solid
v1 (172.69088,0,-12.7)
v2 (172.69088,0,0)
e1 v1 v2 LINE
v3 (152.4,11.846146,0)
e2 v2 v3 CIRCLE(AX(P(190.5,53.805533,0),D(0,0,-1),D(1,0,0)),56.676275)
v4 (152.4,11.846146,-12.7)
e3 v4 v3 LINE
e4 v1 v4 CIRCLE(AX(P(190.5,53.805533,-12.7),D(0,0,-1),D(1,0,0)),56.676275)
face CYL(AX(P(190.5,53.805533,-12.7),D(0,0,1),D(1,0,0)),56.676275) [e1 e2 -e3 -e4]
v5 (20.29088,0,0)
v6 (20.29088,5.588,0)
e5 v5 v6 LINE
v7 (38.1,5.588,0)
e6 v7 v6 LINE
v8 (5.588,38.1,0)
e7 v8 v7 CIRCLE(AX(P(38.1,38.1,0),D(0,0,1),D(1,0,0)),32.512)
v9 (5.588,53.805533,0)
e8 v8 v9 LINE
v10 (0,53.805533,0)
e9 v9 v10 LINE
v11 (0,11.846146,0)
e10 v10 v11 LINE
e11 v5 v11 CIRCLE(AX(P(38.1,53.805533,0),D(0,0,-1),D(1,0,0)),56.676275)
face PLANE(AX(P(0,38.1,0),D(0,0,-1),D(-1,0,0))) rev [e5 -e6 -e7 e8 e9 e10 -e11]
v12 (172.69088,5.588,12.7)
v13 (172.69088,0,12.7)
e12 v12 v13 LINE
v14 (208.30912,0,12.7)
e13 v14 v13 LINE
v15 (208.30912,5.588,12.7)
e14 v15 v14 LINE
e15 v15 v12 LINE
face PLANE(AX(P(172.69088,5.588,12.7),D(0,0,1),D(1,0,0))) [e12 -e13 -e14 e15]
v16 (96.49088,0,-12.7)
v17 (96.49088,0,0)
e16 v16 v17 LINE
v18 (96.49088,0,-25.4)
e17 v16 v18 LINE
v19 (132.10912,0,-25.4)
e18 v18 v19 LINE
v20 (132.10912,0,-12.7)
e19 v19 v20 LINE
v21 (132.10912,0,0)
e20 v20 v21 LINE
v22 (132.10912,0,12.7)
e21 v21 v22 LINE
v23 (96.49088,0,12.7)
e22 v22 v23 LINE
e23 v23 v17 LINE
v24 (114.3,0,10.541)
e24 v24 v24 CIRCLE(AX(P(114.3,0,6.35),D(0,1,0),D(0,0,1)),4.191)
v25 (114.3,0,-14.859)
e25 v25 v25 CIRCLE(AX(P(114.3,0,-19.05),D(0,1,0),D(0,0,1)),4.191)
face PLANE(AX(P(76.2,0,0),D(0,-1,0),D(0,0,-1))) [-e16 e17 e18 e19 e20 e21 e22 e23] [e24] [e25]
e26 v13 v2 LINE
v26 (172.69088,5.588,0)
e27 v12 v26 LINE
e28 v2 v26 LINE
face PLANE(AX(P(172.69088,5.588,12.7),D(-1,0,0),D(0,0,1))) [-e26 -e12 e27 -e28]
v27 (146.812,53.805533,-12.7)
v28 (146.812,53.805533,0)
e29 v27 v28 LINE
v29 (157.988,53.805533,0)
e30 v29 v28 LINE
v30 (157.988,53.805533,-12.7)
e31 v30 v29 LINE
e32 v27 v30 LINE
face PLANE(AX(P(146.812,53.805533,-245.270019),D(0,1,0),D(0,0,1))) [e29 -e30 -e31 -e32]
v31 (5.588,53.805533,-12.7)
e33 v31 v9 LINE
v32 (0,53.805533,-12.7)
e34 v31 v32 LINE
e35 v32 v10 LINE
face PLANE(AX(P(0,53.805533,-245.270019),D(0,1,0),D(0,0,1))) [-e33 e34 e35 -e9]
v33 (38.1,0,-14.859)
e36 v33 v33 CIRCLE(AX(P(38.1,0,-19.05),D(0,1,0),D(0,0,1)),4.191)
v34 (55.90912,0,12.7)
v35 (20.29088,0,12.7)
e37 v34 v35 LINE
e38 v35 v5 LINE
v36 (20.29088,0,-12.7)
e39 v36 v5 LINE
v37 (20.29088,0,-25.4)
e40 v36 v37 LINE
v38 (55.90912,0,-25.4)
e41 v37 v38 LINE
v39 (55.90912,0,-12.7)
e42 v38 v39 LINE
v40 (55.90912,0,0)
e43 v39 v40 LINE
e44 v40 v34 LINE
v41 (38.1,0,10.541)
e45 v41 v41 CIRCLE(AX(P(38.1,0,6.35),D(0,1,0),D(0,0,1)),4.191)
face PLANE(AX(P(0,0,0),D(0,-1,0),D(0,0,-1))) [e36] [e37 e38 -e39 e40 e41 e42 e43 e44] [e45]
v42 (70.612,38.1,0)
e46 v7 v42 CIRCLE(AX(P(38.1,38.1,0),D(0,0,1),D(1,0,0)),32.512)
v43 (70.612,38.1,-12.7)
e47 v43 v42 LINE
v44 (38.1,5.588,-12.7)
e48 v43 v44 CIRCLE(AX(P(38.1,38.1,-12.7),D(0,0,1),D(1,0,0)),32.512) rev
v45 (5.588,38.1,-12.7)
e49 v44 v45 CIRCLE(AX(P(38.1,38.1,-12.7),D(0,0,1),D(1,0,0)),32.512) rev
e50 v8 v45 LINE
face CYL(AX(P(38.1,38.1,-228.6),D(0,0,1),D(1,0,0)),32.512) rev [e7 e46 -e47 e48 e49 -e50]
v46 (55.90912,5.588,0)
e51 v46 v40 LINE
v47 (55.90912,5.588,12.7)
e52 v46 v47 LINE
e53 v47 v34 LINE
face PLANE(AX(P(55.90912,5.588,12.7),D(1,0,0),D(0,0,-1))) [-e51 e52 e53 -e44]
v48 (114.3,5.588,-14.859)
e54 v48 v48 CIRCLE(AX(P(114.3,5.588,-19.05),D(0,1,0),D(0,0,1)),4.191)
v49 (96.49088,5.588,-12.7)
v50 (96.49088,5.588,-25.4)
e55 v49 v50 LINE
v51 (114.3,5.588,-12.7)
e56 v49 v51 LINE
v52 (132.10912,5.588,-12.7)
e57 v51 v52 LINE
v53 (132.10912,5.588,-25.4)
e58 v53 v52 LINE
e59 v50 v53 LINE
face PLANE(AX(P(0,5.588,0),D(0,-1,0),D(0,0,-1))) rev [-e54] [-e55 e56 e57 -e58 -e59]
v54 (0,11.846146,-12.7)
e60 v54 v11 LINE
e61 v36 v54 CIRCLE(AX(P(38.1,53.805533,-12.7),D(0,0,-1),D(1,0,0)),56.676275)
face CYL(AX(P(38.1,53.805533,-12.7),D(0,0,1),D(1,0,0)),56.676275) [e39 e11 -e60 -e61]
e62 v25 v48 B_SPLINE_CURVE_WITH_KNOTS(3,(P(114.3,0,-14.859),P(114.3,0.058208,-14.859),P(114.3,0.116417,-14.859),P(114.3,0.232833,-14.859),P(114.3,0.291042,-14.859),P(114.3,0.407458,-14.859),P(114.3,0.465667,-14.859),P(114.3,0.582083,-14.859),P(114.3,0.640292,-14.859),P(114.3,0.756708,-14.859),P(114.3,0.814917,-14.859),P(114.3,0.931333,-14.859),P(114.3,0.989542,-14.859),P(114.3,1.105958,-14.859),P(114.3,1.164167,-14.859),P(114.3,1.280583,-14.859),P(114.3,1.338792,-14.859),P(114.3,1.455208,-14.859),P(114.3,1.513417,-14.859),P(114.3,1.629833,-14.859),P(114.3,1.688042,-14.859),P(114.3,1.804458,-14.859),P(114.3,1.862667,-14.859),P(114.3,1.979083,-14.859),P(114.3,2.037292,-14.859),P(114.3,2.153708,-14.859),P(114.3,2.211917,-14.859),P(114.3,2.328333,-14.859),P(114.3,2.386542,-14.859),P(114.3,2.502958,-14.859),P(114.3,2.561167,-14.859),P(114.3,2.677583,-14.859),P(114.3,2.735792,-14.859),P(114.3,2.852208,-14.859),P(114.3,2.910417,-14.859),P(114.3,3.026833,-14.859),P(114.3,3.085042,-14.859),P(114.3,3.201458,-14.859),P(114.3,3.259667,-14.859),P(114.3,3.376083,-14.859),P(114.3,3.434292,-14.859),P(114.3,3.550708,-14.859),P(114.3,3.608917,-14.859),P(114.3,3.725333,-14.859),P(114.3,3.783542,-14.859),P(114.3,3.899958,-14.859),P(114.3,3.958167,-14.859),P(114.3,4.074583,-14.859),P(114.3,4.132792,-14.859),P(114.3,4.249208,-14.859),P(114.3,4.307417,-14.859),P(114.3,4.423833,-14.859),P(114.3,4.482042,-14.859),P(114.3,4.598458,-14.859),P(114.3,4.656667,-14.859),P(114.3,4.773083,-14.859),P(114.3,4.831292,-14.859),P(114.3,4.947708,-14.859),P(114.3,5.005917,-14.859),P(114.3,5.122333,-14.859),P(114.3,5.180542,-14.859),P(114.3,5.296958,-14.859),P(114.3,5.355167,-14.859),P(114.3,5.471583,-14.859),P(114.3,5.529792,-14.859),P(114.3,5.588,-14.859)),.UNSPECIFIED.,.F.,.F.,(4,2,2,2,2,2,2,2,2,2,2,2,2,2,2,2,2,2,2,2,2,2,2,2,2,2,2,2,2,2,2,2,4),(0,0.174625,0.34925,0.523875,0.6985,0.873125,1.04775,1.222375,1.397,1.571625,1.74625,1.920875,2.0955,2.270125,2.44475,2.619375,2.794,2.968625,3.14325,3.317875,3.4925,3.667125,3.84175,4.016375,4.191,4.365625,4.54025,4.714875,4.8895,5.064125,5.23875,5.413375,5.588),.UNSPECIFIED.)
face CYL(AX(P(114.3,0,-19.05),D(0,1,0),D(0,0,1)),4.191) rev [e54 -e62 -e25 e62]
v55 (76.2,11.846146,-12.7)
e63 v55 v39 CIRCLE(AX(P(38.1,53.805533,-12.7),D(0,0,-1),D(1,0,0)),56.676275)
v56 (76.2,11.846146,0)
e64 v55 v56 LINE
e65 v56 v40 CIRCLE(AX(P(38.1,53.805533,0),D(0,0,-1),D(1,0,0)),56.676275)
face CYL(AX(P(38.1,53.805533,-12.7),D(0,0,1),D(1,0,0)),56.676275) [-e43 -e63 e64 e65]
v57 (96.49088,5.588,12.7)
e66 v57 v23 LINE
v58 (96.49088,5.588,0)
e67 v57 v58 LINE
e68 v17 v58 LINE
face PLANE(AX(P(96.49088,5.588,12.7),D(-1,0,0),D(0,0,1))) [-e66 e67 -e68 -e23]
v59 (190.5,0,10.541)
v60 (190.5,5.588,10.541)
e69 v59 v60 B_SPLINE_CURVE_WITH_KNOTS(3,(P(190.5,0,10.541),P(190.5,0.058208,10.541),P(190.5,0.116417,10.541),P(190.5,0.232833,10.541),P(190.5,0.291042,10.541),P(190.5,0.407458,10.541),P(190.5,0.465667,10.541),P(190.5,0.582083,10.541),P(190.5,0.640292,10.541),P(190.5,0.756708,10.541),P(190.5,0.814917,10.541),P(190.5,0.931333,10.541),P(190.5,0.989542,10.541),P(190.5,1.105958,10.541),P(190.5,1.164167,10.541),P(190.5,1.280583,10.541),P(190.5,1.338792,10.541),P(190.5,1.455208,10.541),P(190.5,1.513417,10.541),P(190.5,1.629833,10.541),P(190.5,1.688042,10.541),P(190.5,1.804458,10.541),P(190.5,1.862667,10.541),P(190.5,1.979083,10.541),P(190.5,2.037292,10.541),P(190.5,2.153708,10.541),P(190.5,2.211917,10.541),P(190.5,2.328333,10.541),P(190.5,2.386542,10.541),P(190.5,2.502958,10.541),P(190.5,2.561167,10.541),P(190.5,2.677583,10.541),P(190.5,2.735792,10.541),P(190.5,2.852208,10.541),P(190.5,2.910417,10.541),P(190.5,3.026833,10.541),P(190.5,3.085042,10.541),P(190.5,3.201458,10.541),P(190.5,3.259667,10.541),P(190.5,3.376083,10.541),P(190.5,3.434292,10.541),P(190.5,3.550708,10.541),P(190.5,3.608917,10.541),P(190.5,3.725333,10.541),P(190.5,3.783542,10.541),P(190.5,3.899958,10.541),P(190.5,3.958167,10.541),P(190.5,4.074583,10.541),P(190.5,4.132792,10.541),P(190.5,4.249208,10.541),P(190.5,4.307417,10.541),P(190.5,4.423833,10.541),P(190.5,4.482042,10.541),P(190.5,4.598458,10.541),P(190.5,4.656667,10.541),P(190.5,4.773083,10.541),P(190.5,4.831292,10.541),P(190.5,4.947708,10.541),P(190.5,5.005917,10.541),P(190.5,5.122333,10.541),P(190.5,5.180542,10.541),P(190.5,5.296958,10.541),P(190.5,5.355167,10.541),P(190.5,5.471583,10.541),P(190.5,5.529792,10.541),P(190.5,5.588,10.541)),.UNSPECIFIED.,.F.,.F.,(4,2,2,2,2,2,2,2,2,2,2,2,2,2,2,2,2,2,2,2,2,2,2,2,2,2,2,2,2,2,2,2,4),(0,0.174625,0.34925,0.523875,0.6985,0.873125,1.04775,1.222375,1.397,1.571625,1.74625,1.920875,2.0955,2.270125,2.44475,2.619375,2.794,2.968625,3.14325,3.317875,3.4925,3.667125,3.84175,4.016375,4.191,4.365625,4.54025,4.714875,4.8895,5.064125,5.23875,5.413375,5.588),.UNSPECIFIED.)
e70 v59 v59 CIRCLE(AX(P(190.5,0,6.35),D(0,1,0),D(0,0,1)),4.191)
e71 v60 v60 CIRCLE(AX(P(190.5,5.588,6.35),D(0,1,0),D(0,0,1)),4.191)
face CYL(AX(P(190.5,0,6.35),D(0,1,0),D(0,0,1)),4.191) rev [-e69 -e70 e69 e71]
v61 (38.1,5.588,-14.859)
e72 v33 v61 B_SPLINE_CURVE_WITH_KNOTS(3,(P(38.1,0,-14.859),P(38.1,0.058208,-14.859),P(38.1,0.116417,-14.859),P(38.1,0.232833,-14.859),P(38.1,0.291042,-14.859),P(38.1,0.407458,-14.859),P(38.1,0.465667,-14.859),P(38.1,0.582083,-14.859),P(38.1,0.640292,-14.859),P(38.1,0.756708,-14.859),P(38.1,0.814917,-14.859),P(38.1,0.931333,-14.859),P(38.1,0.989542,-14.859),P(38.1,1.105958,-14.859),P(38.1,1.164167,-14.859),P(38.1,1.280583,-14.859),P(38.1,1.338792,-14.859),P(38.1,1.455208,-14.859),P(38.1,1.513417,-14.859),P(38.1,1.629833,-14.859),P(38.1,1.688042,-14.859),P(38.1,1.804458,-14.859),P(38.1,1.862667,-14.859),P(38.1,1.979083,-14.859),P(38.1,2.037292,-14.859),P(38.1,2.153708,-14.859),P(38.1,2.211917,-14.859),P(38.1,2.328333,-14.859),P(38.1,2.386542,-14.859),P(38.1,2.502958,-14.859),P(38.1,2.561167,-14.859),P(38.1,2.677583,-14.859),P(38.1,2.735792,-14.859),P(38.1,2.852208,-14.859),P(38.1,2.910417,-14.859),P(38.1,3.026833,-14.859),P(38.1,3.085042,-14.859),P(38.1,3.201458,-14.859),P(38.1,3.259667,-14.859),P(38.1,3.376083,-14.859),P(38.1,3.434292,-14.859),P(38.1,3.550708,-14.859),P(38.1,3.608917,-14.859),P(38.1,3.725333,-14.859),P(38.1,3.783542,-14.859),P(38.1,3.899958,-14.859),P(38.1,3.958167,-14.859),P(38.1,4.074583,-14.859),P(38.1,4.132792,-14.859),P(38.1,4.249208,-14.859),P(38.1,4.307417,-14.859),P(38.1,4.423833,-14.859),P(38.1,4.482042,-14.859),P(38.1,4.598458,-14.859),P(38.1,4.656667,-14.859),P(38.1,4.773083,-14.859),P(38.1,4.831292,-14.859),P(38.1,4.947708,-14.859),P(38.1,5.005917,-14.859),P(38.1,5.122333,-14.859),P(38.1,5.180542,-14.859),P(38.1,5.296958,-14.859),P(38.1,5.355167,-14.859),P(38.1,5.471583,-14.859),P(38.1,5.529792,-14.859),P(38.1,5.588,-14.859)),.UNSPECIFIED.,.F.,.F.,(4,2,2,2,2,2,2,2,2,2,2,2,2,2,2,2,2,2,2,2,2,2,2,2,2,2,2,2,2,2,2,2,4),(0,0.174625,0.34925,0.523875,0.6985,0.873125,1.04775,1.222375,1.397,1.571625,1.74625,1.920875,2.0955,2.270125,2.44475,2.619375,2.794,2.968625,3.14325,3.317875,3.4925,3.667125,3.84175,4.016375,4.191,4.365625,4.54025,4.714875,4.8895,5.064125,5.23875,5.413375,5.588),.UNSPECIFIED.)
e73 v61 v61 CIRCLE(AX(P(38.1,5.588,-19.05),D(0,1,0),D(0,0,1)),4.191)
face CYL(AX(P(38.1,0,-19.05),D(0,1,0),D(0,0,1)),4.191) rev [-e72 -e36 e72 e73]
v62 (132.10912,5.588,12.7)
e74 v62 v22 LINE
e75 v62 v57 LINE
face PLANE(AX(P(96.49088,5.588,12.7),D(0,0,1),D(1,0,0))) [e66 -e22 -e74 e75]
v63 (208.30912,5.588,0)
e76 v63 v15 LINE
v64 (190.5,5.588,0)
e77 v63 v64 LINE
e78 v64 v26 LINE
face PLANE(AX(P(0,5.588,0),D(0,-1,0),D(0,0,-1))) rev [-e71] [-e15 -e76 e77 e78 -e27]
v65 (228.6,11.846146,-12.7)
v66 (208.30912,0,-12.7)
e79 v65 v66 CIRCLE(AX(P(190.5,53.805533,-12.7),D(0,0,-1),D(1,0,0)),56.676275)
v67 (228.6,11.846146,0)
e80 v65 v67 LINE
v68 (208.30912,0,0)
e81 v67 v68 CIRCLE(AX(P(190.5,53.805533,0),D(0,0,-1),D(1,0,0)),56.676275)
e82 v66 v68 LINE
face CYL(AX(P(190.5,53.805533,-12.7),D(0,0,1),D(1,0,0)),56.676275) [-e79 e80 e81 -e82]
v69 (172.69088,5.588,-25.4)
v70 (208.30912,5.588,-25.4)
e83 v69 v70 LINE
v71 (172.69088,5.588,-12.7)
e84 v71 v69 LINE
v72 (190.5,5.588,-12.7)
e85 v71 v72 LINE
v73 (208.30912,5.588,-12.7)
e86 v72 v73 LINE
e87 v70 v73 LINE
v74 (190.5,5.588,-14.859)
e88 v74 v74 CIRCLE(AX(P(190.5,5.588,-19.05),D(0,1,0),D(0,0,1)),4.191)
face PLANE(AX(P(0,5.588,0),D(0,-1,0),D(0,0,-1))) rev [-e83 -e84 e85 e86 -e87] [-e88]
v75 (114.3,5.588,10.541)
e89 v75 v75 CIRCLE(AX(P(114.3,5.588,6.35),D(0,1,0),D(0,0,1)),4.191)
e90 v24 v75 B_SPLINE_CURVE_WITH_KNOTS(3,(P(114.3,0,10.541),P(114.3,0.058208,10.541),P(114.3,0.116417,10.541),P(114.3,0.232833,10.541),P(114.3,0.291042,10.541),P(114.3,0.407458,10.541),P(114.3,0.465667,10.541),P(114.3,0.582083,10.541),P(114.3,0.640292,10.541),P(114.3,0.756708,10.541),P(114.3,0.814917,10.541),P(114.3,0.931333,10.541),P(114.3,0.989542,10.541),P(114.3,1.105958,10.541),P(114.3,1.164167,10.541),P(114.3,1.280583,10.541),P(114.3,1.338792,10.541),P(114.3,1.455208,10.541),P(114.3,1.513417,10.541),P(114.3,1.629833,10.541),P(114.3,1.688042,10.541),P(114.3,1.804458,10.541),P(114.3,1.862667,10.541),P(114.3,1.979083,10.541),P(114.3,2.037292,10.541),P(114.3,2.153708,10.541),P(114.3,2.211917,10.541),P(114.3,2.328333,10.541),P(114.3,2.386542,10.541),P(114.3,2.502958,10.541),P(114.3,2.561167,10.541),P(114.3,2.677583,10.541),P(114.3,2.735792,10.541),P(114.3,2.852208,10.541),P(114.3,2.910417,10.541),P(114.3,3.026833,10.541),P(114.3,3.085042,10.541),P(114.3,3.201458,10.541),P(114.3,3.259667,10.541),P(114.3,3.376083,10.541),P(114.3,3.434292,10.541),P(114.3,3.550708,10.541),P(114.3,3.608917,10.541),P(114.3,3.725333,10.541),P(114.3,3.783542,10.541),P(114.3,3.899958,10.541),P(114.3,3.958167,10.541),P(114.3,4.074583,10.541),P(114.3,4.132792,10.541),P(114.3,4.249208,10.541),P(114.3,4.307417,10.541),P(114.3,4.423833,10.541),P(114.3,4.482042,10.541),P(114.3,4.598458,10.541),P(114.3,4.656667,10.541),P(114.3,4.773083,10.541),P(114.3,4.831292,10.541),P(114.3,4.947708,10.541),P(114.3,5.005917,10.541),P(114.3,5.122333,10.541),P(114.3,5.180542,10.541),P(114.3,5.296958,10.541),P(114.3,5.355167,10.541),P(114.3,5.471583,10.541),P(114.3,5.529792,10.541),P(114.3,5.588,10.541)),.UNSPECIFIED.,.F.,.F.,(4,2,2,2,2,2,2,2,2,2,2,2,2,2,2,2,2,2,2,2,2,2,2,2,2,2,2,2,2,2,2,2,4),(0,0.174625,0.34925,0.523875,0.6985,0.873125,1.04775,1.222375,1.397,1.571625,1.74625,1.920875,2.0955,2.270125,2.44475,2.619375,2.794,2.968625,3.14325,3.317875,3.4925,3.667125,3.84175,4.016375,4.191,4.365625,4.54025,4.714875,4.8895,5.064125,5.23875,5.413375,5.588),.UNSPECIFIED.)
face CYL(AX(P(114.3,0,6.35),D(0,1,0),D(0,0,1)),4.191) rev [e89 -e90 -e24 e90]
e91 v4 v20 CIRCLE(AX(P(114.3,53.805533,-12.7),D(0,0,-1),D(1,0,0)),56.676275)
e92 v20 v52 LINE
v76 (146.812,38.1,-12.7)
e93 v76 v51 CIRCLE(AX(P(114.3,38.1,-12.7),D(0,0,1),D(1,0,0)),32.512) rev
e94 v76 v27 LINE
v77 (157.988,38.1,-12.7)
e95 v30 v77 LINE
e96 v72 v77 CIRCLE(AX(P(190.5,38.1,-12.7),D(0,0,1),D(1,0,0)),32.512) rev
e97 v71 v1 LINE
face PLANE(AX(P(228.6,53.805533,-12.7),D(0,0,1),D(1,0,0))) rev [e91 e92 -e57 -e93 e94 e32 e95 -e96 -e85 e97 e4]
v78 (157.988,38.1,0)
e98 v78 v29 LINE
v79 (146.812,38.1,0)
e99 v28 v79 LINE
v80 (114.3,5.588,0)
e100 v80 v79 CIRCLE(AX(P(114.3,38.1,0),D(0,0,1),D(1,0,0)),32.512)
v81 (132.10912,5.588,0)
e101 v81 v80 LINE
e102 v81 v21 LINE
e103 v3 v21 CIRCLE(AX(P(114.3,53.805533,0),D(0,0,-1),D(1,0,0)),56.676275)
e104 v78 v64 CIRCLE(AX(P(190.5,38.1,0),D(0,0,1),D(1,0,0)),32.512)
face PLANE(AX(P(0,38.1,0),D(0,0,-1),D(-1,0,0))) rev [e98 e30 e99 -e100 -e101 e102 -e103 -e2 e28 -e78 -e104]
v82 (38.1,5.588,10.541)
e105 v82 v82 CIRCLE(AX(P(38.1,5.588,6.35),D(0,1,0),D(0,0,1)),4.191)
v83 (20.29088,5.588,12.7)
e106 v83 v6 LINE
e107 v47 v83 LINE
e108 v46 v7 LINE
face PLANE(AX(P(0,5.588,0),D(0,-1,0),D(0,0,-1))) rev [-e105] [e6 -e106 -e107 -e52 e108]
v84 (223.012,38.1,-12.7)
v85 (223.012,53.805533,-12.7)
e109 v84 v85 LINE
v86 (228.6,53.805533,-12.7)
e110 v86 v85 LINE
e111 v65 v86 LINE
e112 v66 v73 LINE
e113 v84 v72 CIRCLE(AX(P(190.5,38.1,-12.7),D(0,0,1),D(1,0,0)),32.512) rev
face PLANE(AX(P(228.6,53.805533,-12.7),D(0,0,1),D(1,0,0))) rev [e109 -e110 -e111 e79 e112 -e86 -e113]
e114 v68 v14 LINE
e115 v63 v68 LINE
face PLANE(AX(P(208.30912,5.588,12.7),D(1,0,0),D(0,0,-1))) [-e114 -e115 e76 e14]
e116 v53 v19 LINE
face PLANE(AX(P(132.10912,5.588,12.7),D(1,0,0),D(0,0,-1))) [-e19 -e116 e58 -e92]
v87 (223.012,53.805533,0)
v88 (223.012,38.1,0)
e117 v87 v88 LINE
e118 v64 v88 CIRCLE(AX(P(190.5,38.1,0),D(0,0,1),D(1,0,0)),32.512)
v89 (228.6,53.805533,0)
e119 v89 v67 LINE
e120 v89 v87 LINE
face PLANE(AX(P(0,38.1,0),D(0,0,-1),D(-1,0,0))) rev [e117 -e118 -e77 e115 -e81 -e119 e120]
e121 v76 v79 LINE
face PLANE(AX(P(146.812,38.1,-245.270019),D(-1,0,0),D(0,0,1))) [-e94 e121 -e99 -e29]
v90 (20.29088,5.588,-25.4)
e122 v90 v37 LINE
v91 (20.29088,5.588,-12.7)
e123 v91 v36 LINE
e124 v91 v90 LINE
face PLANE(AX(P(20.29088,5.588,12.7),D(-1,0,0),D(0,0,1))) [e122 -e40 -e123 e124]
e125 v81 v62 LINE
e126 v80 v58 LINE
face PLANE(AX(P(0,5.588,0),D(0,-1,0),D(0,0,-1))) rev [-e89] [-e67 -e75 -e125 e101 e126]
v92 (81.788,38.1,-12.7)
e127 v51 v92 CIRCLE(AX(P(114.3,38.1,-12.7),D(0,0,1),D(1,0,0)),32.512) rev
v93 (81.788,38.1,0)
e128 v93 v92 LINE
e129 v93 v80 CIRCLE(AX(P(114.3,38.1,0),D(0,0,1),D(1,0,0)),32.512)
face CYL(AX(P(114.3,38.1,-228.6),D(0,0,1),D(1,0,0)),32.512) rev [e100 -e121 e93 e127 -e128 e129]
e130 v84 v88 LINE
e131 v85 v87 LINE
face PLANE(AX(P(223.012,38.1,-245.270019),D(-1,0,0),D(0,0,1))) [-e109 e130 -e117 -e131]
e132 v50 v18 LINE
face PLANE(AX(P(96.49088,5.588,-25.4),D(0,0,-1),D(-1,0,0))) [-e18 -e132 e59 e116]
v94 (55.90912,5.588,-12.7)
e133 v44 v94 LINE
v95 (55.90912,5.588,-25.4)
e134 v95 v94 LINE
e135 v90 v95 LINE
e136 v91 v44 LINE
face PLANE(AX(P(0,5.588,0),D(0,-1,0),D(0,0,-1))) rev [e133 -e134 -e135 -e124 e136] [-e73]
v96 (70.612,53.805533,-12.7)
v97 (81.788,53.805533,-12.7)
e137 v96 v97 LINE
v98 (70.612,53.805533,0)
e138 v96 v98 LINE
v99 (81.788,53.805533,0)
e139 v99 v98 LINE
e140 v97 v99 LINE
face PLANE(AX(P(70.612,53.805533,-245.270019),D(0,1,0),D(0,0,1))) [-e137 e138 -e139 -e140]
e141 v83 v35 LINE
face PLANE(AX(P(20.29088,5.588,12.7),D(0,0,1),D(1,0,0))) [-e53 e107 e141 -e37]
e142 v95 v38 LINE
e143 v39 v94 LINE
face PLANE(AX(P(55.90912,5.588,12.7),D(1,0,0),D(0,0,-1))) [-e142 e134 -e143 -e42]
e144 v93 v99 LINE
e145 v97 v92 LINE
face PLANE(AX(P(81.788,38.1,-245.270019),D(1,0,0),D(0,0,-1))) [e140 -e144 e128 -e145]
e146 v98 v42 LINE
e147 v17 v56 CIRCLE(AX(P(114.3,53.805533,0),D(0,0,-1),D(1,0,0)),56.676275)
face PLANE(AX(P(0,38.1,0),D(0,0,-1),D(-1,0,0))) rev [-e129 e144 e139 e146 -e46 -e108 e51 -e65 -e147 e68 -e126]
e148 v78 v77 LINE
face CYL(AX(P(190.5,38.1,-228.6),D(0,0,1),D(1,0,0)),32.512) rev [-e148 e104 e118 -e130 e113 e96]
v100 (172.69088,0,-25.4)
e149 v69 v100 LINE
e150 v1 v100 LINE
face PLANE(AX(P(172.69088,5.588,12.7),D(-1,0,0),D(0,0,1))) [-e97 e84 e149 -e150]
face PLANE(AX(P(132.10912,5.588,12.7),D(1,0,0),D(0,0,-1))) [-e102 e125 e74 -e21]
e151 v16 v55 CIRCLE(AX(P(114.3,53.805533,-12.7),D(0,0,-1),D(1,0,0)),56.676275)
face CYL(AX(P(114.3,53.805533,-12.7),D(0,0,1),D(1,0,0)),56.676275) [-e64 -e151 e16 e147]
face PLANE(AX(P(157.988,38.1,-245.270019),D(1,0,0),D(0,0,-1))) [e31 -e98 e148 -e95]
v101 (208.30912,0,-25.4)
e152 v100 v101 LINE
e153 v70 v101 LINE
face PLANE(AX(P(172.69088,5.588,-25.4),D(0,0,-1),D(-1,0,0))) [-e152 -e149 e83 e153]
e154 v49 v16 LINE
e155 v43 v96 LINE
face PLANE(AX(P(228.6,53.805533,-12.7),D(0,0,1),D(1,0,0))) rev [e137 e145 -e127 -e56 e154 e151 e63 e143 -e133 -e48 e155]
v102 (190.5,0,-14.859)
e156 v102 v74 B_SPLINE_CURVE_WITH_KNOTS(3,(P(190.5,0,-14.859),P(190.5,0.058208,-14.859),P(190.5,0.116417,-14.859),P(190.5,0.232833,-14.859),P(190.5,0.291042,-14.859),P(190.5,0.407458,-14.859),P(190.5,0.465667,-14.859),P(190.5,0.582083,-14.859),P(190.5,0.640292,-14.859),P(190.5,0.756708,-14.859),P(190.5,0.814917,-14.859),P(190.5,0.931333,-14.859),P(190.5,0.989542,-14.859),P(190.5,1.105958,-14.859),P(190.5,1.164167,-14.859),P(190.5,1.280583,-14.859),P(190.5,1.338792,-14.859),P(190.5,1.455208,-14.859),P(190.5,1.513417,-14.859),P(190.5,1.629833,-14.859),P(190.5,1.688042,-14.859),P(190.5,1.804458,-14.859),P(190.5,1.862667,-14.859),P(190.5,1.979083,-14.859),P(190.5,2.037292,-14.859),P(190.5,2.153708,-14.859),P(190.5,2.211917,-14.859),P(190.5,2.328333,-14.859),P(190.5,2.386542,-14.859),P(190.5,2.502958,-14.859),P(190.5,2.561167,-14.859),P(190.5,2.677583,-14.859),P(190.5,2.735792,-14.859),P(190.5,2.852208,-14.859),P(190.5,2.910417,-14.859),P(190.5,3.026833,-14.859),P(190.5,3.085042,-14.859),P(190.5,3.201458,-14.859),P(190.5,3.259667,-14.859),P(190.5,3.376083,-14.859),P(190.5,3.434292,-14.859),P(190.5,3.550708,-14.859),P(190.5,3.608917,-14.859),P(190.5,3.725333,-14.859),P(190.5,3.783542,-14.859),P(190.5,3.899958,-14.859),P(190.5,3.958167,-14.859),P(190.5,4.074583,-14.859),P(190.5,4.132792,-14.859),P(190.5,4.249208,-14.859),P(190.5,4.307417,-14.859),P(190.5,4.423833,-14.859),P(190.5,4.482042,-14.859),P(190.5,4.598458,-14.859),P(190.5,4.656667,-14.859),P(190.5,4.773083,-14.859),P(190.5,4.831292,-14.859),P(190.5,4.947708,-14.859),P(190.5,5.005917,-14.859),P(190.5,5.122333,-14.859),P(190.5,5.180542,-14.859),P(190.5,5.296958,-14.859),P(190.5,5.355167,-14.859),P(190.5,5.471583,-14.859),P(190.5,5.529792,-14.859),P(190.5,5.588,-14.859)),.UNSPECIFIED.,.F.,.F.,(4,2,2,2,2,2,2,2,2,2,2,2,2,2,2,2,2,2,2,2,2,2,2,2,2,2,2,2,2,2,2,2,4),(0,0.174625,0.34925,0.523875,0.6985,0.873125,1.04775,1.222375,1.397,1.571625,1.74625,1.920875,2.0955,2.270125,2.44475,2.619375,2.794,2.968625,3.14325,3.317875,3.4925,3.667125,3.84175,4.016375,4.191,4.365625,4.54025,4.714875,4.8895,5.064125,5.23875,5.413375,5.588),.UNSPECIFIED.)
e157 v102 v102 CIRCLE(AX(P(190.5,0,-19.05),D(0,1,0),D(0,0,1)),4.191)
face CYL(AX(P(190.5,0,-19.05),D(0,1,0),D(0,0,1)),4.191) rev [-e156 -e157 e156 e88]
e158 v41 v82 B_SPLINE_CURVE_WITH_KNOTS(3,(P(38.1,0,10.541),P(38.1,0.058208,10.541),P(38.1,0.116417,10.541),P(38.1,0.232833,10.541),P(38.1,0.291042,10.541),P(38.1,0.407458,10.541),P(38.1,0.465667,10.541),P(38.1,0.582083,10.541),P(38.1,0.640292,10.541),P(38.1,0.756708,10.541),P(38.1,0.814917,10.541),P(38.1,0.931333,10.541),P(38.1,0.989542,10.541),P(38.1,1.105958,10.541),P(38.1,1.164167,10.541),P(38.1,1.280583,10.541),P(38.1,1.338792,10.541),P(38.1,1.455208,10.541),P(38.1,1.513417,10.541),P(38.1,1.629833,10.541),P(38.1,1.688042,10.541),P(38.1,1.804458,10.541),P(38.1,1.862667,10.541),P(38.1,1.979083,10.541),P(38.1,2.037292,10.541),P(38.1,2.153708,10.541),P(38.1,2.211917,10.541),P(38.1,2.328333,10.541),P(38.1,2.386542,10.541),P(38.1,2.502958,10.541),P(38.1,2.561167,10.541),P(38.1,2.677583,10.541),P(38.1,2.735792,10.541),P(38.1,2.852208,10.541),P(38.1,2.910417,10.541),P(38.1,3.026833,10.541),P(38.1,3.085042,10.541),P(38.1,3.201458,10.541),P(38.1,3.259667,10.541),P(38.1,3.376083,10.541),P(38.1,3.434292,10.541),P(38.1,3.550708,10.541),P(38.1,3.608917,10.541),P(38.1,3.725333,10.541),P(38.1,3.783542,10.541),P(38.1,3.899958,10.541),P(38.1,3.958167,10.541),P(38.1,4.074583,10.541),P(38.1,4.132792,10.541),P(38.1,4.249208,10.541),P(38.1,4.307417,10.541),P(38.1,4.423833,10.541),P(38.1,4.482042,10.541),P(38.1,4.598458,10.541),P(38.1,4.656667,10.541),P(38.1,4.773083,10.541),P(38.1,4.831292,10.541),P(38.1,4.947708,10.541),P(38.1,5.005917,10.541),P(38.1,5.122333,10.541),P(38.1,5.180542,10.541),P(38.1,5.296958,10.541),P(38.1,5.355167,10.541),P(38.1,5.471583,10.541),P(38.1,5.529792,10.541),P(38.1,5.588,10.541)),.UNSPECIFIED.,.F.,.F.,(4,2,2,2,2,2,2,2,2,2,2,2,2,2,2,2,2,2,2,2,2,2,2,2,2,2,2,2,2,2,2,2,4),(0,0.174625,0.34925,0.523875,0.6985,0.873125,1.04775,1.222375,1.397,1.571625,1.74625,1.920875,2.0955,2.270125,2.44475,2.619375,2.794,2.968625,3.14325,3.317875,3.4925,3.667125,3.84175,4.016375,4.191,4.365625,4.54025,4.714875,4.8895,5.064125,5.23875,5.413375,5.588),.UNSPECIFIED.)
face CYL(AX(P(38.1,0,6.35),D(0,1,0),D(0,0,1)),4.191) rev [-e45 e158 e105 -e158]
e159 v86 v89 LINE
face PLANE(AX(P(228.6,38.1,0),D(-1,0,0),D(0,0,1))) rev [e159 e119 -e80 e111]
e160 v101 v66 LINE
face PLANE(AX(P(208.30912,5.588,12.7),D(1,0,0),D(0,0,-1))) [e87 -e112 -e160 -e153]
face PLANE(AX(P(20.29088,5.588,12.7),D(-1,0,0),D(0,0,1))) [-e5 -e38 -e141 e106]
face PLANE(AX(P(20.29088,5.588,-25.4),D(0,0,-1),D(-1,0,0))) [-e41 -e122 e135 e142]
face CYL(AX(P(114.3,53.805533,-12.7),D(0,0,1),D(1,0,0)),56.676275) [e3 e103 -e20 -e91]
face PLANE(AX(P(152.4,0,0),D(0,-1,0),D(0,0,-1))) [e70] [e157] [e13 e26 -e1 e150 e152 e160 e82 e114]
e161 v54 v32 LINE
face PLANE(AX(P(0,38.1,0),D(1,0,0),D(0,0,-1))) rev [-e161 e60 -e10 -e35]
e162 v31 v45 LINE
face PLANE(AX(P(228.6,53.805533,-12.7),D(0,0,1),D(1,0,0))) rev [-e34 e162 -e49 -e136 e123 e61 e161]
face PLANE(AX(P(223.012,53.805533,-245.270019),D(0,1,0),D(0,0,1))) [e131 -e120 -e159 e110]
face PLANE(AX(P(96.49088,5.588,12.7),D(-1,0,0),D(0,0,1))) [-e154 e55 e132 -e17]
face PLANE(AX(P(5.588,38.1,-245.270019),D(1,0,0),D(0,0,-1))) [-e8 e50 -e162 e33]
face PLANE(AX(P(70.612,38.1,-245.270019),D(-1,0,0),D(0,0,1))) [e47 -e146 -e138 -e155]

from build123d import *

# Parameters (mm, degrees)
SKETCH1_W               = 76.2
SKETCH1_H               = 228.6
BOSS_EXTRUDE1_DEPTH     = 38.1
SKETCH2_R               = 32.512
CUT_EXTRUDE2_DEPTH      = 244.959033446
SKETCH3_W               = 5.588
SKETCH3_H               = 15.705533419
BOSS_EXTRUDE2_DEPTH     = 228.6
SKETCH4_W               = 8.89
SKETCH4_H               = 5.08
CUT_EXTRUDE3_DEPTH      = 247.899646469
CRVPATTERN1_START       = -228.6
CRVPATTERN1_OUTLINE_W   = 5.588
CRVPATTERN1_OUTLINE_H   = 5.312766709
CRVPATTERN1_DEPTH       = 228.6
CRVPATTERN1_START_2     = -165.1
CRVPATTERN1_2_OUTLINE_W = 5.588
CRVPATTERN1_2_OUTLINE_H = 5.08
CRVPATTERN1_2_DEPTH     = 101.6
CRVPATTERN1_3_OUTLINE_W = 5.588
CRVPATTERN1_3_OUTLINE_H = 5.08
CRVPATTERN1_3_DEPTH     = 54.61
CRVPATTERN1_START_3     = -54.61
CRVPATTERN1_4_OUTLINE_W = 5.588
CRVPATTERN1_4_OUTLINE_H = 5.08
CRVPATTERN1_4_DEPTH     = 54.61
CRVPATTERN1_5_OUTLINE_W = 5.588
CRVPATTERN1_5_OUTLINE_H = 5.312766709
CRVPATTERN1_5_DEPTH     = 228.6
CRVPATTERN1_6_OUTLINE_W = 5.588
CRVPATTERN1_6_OUTLINE_H = 5.08
CRVPATTERN1_6_DEPTH     = 101.6
CRVPATTERN1_7_OUTLINE_W = 5.588
CRVPATTERN1_7_OUTLINE_H = 5.08
CRVPATTERN1_7_DEPTH     = 54.61
CRVPATTERN1_8_OUTLINE_W = 5.588
CRVPATTERN1_8_OUTLINE_H = 5.08
CRVPATTERN1_8_DEPTH     = 54.61
SKETCH6_W               = 215.9
SKETCH6_H               = 53.805533419
CUT_EXTRUDE4_DEPTH      = 328.736106382
CUT_EXTRUDE5_DEPTH      = 236.189892271
BOSS_EXTRUDE4_START     = -5.588
SKETCH8_W               = 35.618239262
SKETCH8_H               = 38.1
BOSS_EXTRUDE4_DEPTH     = 5.588
SKETCH9_R               = 4.191
CUT_EXTRUDE6_DEPTH      = 236.006490398


# Read off the part's stored shape, not the designer's step: CrvPattern1
with BuildPart() as part:
    # Sketch1 → Boss-Extrude1 (new body)
    with BuildSketch(Plane(origin=(0, 0, 0), x_dir=(1, 0, 0), z_dir=(0, 1, 0))):
        with Locations((38.1, 114.3)):
            Rectangle(SKETCH1_W, SKETCH1_H)
    extrude(amount=BOSS_EXTRUDE1_DEPTH)

    # Sketch2 → Cut-Extrude2 (cut, through all)
    with BuildSketch(Plane.XY):
        with Locations((38.1, 38.1)):
            Circle(SKETCH2_R)
    extrude(amount=-CUT_EXTRUDE2_DEPTH, mode=Mode.SUBTRACT)

    # Sketch3 → Boss-Extrude2 (add)
    with BuildSketch(Plane.XY):
        with Locations((2.794, 45.95276671)):
            Rectangle(SKETCH3_W, SKETCH3_H)
        with Locations((73.406, 45.95276671)):
            Rectangle(SKETCH3_W, SKETCH3_H)
    extrude(amount=-BOSS_EXTRUDE2_DEPTH)

    # Sketch4 → Cut-Extrude3 (cut, through all)
    with BuildSketch(Plane(origin=(76.2, 0, 0), x_dir=(0, 0, -1), z_dir=(1, 0, 0))):
        with Locations((59.055, 45.95276671)):
            Rectangle(SKETCH4_W, SKETCH4_H)
        with Locations((169.545, 45.95276671)):
            Rectangle(SKETCH4_W, SKETCH4_H)
    extrude(amount=-CUT_EXTRUDE3_DEPTH, mode=Mode.SUBTRACT)


with BuildPart() as body_2:
    # CrvPattern1 outline → CrvPattern1 (new body)
    with BuildSketch(Plane.XY.offset(CRVPATTERN1_START)):
        with BuildLine():
            Line((152.4, 43.41276671), (152.4, 0))
            Line((152.4, 0), (228.6, 0))
            Line((228.6, 0), (228.6, 43.41276671))
            Line((228.6, 43.41276671), (223.012, 43.41276671))
            Line((223.012, 43.41276671), (223.012, 38.1))
            ThreePointArc((223.012, 38.1), (190.5, 5.588), (157.988, 38.1))
            Line((157.988, 38.1), (157.988, 43.41276671))
            Line((157.988, 43.41276671), (152.4, 43.41276671))
        make_face()
        with Locations((155.194, 51.149150065)):
            Rectangle(CRVPATTERN1_OUTLINE_W, CRVPATTERN1_OUTLINE_H)
        with Locations((225.806, 51.149150065)):
            Rectangle(CRVPATTERN1_OUTLINE_W, CRVPATTERN1_OUTLINE_H)
    extrude(amount=CRVPATTERN1_DEPTH)

    # CrvPattern1 2 outline → CrvPattern1 2 (add)
    with BuildSketch(Plane.XY.offset(CRVPATTERN1_START_2)):
        with Locations((155.194, 45.95276671)):
            Rectangle(CRVPATTERN1_2_OUTLINE_W, CRVPATTERN1_2_OUTLINE_H)
        with Locations((225.806, 45.95276671)):
            Rectangle(CRVPATTERN1_2_OUTLINE_W, CRVPATTERN1_2_OUTLINE_H)
    extrude(amount=CRVPATTERN1_2_DEPTH)

    # CrvPattern1 3 outline → CrvPattern1 3 (add)
    with BuildSketch(Plane.XY.offset(CRVPATTERN1_START)):
        with Locations((155.194, 45.95276671)):
            Rectangle(CRVPATTERN1_3_OUTLINE_W, CRVPATTERN1_3_OUTLINE_H)
        with Locations((225.806, 45.95276671)):
            Rectangle(CRVPATTERN1_3_OUTLINE_W, CRVPATTERN1_3_OUTLINE_H)
    extrude(amount=CRVPATTERN1_3_DEPTH)

    # CrvPattern1 4 outline → CrvPattern1 4 (add)
    with BuildSketch(Plane.XY.offset(CRVPATTERN1_START_3)):
        with Locations((155.194, 45.95276671)):
            Rectangle(CRVPATTERN1_4_OUTLINE_W, CRVPATTERN1_4_OUTLINE_H)
        with Locations((225.806, 45.95276671)):
            Rectangle(CRVPATTERN1_4_OUTLINE_W, CRVPATTERN1_4_OUTLINE_H)
    extrude(amount=CRVPATTERN1_4_DEPTH)


with BuildPart() as body_3:
    # CrvPattern1 5 outline → CrvPattern1 5 (new body)
    with BuildSketch(Plane.XY.offset(CRVPATTERN1_START)):
        with BuildLine():
            Line((76.2, 43.41276671), (76.2, 0))
            Line((76.2, 0), (152.4, 0))
            Line((152.4, 0), (152.4, 43.41276671))
            Line((152.4, 43.41276671), (146.812, 43.41276671))
            Line((146.812, 43.41276671), (146.812, 38.1))
            ThreePointArc((146.812, 38.1), (114.3, 5.588), (81.788, 38.1))
            Line((81.788, 38.1), (81.788, 43.41276671))
            Line((81.788, 43.41276671), (76.2, 43.41276671))
        make_face()
        with Locations((78.994, 51.149150065)):
            Rectangle(CRVPATTERN1_5_OUTLINE_W, CRVPATTERN1_5_OUTLINE_H)
        with Locations((149.606, 51.149150065)):
            Rectangle(CRVPATTERN1_5_OUTLINE_W, CRVPATTERN1_5_OUTLINE_H)
    extrude(amount=CRVPATTERN1_5_DEPTH)

    # CrvPattern1 6 outline → CrvPattern1 6 (add)
    with BuildSketch(Plane.XY.offset(CRVPATTERN1_START_2)):
        with Locations((78.994, 45.95276671)):
            Rectangle(CRVPATTERN1_6_OUTLINE_W, CRVPATTERN1_6_OUTLINE_H)
        with Locations((149.606, 45.95276671)):
            Rectangle(CRVPATTERN1_6_OUTLINE_W, CRVPATTERN1_6_OUTLINE_H)
    extrude(amount=CRVPATTERN1_6_DEPTH)

    # CrvPattern1 7 outline → CrvPattern1 7 (add)
    with BuildSketch(Plane.XY.offset(CRVPATTERN1_START)):
        with Locations((78.994, 45.95276671)):
            Rectangle(CRVPATTERN1_7_OUTLINE_W, CRVPATTERN1_7_OUTLINE_H)
        with Locations((149.606, 45.95276671)):
            Rectangle(CRVPATTERN1_7_OUTLINE_W, CRVPATTERN1_7_OUTLINE_H)
    extrude(amount=CRVPATTERN1_7_DEPTH)

    # CrvPattern1 8 outline → CrvPattern1 8 (add)
    with BuildSketch(Plane.XY.offset(CRVPATTERN1_START_3)):
        with Locations((78.994, 45.95276671)):
            Rectangle(CRVPATTERN1_8_OUTLINE_W, CRVPATTERN1_8_OUTLINE_H)
        with Locations((149.606, 45.95276671)):
            Rectangle(CRVPATTERN1_8_OUTLINE_W, CRVPATTERN1_8_OUTLINE_H)
    extrude(amount=CRVPATTERN1_8_DEPTH)


with BuildPart() as cut_extrude4_tool:
    # Sketch6 → Cut-Extrude4 (new, through all)
    with BuildSketch(Plane.ZY):
        with Locations((-120.65, 26.90276671)):
            Rectangle(SKETCH6_W, SKETCH6_H)
    extrude(amount=-CUT_EXTRUDE4_DEPTH)


with BuildPart() as part_1:
    add(part.part)

    # Cut-Extrude4: cut by cut_extrude4_tool
    add(cut_extrude4_tool.part, mode=Mode.SUBTRACT)


with BuildPart() as body_2_1:
    add(body_2.part)

    # Cut-Extrude4: cut by cut_extrude4_tool
    add(cut_extrude4_tool.part, mode=Mode.SUBTRACT)


with BuildPart() as body_3_1:
    add(body_3.part)

    # Cut-Extrude4: cut by cut_extrude4_tool
    add(cut_extrude4_tool.part, mode=Mode.SUBTRACT)


with BuildPart() as cut_extrude5_tool:
    # Sketch7 → Cut-Extrude5 (new, through all)
    with BuildSketch(Plane.XY):
        with BuildLine():
            Line((0, 0), (20.290880369, 0))
            ThreePointArc((20.290880369, 0), (9.524832285, 4.860053969), (0, 11.846146286))
            Line((0, 11.846146286), (0, 0))
        make_face()
        with BuildLine():
            Line((228.6, 0), (228.6, 11.846146286))
            ThreePointArc((228.6, 11.846146286), (219.075167715, 4.860053969), (208.309119631, 0))
            Line((208.309119631, 0), (228.6, 0))
        make_face()
        with BuildLine():
            Line((55.909119631, 0), (96.490880369, 0))
            ThreePointArc((96.490880369, 0), (85.724832285, 4.860053969), (76.2, 11.846146286))
            ThreePointArc((76.2, 11.846146286), (66.675167715, 4.860053969), (55.909119631, 0))
        make_face()
        with BuildLine():
            Line((132.109119631, 0), (172.690880369, 0))
            ThreePointArc((172.690880369, 0), (161.924832285, 4.860053969), (152.4, 11.846146286))
            ThreePointArc((152.4, 11.846146286), (142.875167715, 4.860053969), (132.109119631, 0))
        make_face()
    extrude(amount=-CUT_EXTRUDE5_DEPTH)


with BuildPart() as part_2:
    add(part_1.part)

    # Cut-Extrude5: cut by cut_extrude5_tool
    add(cut_extrude5_tool.part, mode=Mode.SUBTRACT)



with BuildPart() as body_2_2:
    add(body_2_1.part)

    # Cut-Extrude5: cut by cut_extrude5_tool
    add(cut_extrude5_tool.part, mode=Mode.SUBTRACT)


with BuildPart() as body_3_2:
    add(body_3_1.part)

    # Cut-Extrude5: cut by cut_extrude5_tool
    add(cut_extrude5_tool.part, mode=Mode.SUBTRACT)


with BuildPart() as part_3:
    add(part_2.part)

    add(body_2_2.part)  # Boss-Extrude4 merges body 2

    add(body_3_2.part)  # Boss-Extrude4 merges body 3
    # Sketch8 → Boss-Extrude4 (add)
    with BuildSketch(Plane(origin=(0, 0, 0), x_dir=(-1, 0, 0), z_dir=(0, -1, 0)).offset(BOSS_EXTRUDE4_START)):
        with Locations((-38.1, 6.35)):
            Rectangle(SKETCH8_W, SKETCH8_H)
        with Locations((-114.3, 6.35)):
            Rectangle(SKETCH8_W, SKETCH8_H)
        with Locations((-190.5, 6.35)):
            Rectangle(SKETCH8_W, SKETCH8_H)
    extrude(amount=BOSS_EXTRUDE4_DEPTH)

    # Sketch9 → Cut-Extrude6 (cut, through all)
    with BuildSketch(Plane(origin=(0, 5.588, 0), x_dir=(1, 0, 0), z_dir=(0, 1, 0))):
        with Locations(Location((38.1, 19.05, 0), (0, 0, 270))):
            Circle(SKETCH9_R)
        with Locations(Location((114.3, 19.05, 0), (0, 0, 270))):
            Circle(SKETCH9_R)
        with Locations(Location((190.5, 19.05, 0), (0, 0, 270))):
            Circle(SKETCH9_R)
        with Locations(Location((114.3, -6.35, 0), (0, 0, 270))):
            Circle(SKETCH9_R)
        with Locations(Location((190.5, -6.35, 0), (0, 0, 270))):
            Circle(SKETCH9_R)
        with Locations(Location((38.1, -6.35, 0), (0, 0, 270))):
            Circle(SKETCH9_R)
    extrude(amount=-CUT_EXTRUDE6_DEPTH, mode=Mode.SUBTRACT)


solid = part_3.part
